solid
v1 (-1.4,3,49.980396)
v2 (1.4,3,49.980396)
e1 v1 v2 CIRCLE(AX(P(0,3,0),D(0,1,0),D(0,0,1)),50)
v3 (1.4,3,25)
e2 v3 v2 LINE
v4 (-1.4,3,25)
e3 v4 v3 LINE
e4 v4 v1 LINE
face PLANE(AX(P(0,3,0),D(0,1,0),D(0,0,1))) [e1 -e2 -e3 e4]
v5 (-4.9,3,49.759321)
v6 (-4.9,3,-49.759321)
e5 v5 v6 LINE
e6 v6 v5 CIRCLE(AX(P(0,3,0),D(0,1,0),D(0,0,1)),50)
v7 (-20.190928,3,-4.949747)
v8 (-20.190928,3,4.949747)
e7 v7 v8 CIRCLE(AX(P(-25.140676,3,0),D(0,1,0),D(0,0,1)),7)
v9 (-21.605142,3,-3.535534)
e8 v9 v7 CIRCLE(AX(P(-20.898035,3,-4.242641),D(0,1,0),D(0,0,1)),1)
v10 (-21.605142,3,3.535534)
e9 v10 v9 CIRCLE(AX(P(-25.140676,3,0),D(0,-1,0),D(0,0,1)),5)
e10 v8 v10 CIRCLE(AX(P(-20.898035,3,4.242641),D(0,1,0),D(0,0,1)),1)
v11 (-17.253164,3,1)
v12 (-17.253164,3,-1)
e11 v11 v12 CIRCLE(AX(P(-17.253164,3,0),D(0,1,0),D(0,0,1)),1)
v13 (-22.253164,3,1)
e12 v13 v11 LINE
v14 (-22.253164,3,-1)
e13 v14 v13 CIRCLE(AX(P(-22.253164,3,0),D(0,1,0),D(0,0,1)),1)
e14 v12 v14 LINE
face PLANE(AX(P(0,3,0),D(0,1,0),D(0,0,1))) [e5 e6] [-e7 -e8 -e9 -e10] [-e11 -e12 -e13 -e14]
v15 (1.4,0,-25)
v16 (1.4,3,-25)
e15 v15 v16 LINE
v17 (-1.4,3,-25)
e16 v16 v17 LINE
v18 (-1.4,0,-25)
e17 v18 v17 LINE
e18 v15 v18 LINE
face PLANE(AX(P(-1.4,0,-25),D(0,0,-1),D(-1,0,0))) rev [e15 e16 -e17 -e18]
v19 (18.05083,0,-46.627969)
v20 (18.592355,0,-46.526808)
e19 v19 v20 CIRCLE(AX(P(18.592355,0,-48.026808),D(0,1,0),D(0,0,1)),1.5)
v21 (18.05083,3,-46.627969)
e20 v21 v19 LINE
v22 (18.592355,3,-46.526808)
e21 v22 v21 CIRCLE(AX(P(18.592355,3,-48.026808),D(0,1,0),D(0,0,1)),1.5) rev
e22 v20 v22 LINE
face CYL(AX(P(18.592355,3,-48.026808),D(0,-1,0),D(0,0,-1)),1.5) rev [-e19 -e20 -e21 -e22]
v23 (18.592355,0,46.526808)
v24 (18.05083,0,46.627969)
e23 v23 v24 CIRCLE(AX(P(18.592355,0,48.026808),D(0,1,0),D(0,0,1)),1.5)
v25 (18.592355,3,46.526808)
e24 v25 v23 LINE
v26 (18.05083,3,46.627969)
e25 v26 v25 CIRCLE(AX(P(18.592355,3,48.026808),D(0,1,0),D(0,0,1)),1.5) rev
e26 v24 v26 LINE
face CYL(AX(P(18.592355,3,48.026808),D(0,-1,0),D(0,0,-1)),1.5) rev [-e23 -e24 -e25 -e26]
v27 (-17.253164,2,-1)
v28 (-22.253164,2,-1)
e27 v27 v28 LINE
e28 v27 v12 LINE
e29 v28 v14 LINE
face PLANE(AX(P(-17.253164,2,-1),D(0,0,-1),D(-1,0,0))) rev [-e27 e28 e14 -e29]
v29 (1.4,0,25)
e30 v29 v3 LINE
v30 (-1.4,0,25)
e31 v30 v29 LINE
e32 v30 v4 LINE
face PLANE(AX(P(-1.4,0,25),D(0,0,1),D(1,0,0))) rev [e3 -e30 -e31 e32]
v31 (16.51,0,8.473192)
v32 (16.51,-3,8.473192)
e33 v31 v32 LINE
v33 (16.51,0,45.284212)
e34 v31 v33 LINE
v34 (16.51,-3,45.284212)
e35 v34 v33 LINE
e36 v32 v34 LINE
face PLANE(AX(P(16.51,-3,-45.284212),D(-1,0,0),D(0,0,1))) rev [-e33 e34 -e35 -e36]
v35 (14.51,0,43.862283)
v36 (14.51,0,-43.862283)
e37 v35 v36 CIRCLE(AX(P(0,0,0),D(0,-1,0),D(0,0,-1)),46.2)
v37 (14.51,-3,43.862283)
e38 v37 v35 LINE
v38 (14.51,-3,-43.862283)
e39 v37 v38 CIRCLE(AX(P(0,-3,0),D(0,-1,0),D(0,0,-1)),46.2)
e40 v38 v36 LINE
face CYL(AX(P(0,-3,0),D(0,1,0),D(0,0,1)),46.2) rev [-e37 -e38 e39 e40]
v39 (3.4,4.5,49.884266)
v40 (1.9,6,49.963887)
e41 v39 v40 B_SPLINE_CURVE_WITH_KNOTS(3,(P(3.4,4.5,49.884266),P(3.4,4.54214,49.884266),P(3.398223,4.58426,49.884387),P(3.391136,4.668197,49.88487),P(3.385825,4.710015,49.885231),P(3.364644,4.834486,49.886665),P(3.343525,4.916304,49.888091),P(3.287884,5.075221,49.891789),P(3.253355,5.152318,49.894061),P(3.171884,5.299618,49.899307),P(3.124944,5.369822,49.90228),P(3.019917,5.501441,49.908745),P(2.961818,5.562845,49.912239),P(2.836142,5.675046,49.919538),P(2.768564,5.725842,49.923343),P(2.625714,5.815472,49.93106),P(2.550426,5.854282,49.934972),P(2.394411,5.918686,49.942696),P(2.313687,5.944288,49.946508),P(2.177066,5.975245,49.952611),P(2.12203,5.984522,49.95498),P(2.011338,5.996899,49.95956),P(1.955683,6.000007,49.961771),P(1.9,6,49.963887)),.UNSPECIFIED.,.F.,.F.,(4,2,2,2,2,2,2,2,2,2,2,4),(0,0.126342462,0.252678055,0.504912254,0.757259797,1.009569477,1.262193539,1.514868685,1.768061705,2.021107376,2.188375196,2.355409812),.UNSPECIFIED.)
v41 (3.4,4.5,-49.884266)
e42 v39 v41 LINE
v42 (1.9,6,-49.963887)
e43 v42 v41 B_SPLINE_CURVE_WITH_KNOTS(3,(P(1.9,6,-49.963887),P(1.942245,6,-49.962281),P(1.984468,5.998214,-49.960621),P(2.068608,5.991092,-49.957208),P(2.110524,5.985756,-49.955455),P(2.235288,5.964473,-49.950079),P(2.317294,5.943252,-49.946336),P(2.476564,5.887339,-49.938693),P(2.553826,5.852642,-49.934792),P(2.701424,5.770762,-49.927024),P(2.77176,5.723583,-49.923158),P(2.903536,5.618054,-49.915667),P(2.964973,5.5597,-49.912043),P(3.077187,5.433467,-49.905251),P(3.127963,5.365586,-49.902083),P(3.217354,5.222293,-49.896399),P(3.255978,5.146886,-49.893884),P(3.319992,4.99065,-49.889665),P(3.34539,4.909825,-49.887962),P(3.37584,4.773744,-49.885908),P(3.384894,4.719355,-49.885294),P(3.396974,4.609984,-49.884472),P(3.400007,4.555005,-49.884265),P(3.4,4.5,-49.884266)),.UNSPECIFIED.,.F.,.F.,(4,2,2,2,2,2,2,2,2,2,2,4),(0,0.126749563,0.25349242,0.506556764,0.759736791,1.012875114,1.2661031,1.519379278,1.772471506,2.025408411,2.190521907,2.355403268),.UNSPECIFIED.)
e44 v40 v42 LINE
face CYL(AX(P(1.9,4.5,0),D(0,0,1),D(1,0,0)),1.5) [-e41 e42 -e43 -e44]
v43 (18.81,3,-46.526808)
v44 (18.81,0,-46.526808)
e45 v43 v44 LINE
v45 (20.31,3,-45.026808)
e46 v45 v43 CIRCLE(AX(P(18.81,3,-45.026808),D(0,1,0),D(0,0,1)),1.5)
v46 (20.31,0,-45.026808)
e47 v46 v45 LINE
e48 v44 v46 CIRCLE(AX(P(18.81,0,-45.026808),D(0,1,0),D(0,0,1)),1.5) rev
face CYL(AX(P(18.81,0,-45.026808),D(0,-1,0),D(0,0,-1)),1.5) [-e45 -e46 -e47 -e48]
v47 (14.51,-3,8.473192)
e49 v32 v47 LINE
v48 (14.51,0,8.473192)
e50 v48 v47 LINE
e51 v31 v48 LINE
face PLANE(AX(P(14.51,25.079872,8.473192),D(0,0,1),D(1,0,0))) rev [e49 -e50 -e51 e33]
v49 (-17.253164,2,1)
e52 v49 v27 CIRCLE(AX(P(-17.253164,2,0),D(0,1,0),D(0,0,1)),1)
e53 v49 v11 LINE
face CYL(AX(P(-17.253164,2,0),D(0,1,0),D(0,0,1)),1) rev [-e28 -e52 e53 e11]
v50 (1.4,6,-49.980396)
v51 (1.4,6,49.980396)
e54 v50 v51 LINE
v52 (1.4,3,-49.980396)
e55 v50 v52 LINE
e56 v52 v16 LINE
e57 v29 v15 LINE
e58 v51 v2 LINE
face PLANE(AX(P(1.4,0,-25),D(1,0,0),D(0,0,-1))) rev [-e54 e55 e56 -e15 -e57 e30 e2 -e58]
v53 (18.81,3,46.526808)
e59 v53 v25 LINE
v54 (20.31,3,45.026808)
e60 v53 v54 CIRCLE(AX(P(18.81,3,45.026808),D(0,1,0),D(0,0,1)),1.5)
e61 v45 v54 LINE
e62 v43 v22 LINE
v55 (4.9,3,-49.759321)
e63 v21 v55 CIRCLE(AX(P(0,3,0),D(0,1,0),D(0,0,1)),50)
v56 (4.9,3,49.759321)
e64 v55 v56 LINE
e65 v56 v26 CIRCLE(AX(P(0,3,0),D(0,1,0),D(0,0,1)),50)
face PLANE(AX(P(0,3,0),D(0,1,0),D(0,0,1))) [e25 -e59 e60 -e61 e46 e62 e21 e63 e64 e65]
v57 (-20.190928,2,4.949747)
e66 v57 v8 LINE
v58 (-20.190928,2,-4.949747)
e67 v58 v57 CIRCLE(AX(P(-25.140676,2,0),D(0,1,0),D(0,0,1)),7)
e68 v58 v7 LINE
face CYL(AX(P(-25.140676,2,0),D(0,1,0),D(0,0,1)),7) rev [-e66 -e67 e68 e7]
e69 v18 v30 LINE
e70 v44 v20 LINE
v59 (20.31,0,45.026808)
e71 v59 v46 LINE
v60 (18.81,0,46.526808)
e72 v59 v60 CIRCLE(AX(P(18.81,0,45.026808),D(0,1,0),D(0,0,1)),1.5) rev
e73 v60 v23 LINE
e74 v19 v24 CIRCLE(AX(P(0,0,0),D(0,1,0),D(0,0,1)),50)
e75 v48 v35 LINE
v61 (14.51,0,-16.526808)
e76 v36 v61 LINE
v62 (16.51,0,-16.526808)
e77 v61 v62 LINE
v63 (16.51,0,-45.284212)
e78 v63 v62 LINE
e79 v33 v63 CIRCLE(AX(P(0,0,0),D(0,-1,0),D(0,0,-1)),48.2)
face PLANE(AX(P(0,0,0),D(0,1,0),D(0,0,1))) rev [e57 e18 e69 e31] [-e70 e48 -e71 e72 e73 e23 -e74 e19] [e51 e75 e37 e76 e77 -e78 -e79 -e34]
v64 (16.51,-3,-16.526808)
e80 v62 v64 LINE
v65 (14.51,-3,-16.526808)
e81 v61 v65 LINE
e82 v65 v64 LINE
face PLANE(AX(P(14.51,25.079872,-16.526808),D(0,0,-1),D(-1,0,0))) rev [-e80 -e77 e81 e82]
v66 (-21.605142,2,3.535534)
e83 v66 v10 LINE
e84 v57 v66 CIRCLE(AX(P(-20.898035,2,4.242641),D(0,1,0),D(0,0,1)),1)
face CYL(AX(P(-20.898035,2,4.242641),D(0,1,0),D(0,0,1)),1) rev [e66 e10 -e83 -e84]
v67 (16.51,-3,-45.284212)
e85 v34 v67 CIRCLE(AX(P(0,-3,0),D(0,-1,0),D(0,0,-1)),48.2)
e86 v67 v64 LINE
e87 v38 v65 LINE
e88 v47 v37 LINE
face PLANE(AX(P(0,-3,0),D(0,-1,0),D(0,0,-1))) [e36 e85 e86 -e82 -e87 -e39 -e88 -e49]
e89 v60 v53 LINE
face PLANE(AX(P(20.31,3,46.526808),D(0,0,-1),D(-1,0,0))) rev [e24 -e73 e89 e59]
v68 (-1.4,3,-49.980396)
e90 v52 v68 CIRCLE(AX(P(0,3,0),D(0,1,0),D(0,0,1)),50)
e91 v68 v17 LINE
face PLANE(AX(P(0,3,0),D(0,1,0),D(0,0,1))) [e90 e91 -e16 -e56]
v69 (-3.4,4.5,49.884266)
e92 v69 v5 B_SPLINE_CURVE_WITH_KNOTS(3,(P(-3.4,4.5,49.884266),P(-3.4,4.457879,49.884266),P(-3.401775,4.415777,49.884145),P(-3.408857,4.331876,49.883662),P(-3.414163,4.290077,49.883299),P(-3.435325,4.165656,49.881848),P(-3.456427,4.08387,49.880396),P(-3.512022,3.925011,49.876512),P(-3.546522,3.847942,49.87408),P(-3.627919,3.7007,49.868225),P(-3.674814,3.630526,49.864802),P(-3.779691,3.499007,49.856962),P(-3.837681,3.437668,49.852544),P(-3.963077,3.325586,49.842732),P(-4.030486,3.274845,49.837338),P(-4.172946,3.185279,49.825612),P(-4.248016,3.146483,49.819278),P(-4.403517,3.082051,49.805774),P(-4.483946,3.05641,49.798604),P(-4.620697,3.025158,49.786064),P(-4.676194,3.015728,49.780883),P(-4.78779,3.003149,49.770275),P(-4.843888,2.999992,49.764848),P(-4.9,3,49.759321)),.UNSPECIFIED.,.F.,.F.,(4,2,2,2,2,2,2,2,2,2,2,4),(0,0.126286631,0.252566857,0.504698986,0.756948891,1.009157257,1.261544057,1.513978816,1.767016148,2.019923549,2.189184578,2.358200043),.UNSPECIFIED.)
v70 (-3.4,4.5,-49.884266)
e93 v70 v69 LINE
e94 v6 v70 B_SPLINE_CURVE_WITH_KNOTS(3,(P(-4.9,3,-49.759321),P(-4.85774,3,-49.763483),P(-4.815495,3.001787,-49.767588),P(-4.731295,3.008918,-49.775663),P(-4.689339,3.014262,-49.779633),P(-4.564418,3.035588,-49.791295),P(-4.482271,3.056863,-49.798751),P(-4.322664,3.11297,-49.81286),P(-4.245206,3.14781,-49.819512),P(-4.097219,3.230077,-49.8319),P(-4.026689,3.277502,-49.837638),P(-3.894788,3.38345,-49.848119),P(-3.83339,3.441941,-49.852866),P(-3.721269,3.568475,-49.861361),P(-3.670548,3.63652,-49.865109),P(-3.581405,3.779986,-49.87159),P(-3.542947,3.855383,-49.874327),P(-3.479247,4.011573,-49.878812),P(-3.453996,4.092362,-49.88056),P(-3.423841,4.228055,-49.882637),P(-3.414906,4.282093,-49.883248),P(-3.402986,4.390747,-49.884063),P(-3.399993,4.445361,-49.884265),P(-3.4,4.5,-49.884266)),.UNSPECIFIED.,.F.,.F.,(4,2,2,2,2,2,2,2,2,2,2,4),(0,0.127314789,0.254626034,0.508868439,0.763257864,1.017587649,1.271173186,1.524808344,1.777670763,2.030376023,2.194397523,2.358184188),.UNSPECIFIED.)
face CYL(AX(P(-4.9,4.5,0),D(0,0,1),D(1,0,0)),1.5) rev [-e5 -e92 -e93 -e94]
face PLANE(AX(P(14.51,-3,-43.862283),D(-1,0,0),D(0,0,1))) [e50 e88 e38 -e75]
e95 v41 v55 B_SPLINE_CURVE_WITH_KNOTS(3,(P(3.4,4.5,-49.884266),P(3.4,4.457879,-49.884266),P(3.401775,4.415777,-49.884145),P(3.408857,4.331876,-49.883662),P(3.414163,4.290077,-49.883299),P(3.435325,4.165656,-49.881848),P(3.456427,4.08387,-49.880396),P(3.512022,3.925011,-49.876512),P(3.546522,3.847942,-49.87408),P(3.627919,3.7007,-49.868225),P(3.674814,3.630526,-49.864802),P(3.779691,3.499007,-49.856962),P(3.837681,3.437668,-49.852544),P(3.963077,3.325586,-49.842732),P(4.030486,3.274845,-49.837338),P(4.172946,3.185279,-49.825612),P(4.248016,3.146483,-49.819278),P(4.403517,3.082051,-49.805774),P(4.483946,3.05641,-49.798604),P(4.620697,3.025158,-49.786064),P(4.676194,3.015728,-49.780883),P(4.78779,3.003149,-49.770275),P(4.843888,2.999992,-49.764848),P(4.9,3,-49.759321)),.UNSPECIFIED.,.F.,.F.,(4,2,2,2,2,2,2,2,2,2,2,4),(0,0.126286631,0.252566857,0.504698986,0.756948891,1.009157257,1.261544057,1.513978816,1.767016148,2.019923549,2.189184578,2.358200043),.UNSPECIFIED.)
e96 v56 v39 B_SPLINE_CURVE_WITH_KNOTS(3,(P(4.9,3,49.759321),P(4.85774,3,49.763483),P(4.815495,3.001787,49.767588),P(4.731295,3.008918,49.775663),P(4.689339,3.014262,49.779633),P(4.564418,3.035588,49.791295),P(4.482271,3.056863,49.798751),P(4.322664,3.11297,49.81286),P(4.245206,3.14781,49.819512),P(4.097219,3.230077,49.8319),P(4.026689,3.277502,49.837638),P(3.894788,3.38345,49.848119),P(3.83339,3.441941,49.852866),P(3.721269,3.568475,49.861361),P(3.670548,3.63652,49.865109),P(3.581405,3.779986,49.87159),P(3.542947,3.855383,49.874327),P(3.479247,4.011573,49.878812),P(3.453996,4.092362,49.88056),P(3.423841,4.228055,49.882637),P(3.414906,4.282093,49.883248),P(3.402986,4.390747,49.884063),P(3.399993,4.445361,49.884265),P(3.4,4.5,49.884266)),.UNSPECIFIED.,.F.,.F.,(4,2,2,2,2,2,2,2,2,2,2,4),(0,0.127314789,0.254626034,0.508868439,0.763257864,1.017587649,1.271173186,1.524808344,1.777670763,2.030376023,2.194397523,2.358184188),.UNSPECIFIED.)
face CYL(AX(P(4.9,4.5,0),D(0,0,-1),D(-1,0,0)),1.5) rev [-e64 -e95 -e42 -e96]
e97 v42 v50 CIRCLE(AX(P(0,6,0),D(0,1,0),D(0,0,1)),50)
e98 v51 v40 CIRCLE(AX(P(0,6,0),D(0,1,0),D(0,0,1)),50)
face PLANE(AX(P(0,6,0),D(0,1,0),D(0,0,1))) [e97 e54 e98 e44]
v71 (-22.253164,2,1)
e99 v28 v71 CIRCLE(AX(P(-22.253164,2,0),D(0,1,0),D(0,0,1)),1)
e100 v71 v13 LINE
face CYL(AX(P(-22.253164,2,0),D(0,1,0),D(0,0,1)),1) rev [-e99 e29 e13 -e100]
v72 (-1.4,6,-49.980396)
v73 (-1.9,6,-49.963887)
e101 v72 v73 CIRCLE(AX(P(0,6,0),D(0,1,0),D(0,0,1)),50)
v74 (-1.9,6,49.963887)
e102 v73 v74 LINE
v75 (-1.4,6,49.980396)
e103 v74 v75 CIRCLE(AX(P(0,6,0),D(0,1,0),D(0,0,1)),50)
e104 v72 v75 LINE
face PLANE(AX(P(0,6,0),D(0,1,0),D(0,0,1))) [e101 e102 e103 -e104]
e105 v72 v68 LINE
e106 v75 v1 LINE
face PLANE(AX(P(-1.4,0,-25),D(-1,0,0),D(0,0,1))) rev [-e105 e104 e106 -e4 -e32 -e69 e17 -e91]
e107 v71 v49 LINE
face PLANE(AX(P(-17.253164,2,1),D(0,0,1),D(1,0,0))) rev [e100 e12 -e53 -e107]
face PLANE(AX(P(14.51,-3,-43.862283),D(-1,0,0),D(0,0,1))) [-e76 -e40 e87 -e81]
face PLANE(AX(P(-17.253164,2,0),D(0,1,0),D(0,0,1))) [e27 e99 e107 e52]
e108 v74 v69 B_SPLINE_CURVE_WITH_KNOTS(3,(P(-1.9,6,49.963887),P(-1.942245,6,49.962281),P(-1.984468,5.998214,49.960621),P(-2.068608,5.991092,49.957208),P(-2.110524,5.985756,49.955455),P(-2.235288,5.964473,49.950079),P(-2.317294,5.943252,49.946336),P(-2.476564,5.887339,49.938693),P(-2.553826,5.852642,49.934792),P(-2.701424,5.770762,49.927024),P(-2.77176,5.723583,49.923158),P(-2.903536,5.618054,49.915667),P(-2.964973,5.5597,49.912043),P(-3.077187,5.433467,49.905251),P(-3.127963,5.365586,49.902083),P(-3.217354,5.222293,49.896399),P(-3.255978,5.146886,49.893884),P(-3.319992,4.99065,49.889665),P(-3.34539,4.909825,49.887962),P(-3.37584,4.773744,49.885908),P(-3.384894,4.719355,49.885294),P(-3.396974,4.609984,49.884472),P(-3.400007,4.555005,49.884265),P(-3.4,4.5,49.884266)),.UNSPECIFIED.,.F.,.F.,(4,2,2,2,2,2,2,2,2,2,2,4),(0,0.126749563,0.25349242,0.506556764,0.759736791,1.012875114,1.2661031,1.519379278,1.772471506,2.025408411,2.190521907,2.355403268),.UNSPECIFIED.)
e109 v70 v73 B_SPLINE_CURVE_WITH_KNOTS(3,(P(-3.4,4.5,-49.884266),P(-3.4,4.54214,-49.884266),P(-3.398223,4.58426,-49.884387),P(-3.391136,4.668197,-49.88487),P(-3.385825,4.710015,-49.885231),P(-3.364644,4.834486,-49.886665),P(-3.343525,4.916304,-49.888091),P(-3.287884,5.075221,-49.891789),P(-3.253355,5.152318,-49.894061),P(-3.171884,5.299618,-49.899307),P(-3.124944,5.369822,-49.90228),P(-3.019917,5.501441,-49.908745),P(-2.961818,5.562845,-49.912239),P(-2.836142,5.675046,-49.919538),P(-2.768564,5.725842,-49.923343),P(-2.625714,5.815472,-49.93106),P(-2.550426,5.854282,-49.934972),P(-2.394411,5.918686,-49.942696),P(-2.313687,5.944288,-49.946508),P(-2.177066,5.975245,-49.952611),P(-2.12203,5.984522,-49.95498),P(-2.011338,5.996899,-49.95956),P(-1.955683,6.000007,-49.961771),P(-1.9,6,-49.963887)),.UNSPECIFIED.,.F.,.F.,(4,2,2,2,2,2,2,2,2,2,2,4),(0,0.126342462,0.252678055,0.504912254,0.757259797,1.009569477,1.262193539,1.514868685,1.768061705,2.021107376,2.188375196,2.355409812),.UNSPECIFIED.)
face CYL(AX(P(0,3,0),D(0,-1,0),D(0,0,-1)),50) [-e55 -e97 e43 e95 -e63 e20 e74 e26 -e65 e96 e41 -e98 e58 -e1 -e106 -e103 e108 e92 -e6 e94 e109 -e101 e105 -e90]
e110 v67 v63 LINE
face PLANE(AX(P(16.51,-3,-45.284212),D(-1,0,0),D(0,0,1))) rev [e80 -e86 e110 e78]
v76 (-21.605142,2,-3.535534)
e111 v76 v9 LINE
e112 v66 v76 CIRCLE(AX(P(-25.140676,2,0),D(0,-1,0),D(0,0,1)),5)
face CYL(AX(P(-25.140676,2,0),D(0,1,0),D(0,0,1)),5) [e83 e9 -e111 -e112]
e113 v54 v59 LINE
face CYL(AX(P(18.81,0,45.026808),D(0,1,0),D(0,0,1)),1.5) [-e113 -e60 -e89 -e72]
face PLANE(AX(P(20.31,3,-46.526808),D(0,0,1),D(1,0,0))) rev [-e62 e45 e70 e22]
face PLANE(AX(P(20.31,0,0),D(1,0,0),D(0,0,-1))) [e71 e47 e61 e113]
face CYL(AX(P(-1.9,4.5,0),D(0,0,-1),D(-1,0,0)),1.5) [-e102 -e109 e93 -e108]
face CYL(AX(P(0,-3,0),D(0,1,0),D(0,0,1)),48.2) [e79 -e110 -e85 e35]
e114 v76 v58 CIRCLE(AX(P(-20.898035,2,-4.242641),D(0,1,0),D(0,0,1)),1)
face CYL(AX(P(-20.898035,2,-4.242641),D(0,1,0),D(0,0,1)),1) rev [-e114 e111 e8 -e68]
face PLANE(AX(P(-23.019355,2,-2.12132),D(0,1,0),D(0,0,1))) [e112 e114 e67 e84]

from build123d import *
from build123d.topology import SkipClean

# Parameters (mm, degrees)
BOSS_EXTRUDE1_DEPTH     = 3
CUT_EXTRUDE1_DEPTH      = 71.774289117
CUT_EXTRUDE1_DEPTH_BACK = 71.774289117
SKETCH2_W               = 2.8
SKETCH2_H               = 50
BOSS_EXTRUDE2_DEPTH     = 3
SKETCH4_W               = 2
SKETCH4_H               = 25
CUT_EXTRUDE2_DEPTH      = 3
BOSS_EXTRUDE3_DEPTH     = 3
SKETCH7_W               = 93.053616802
SKETCH7_H               = 3
BOSS_EXTRUDE4_DEPTH     = 2
CUT_EXTRUDE3_DEPTH      = 1
FILLET1_R               = 1.5


with BuildPart() as part:
    # Sketch1 → Boss-Extrude1 (new body)
    with BuildSketch(Plane(origin=(0, 0, 0), x_dir=(1, 0, 0), z_dir=(0, 1, 0))):
        with BuildLine():
            Line((18.31, 46.526808401), (18.31, -46.526808401))
            ThreePointArc((18.31, -46.526808401), (-50, 0), (18.31, 46.526808401))
        make_face()
    extrude(amount=BOSS_EXTRUDE1_DEPTH)

    # Sketch2 → Cut-Extrude1 (cut, two sides: drawn at the far end of the back side and taken through both)
    with BuildSketch(Plane(origin=(0, 3, 0), x_dir=(1, 0, 0), z_dir=(0, 1, 0)).offset(-CUT_EXTRUDE1_DEPTH_BACK)):
        Rectangle(SKETCH2_W, SKETCH2_H)
    extrude(amount=CUT_EXTRUDE1_DEPTH + CUT_EXTRUDE1_DEPTH_BACK, mode=Mode.SUBTRACT)

    # Sketch3 → Boss-Extrude2 (add)
    with BuildSketch(Plane.XZ):
        with BuildLine():
            Line((16.51, -45.284212481), (16.51, 45.284212481))
            ThreePointArc((16.51, 45.284212481), (-48.2, 0), (16.51, -45.284212481))
        make_face()
        with BuildLine():
            Line((14.51, -43.862283342), (14.51, 43.862283342))
            ThreePointArc((14.51, 43.862283342), (-46.2, 0), (14.51, -43.862283342))
        make_face(mode=Mode.SUBTRACT)
    extrude(amount=BOSS_EXTRUDE2_DEPTH)

    # Sketch4 → Cut-Extrude2 (cut)
    with BuildSketch(Plane.XZ.offset(3)):
        with Locations((15.51, -4.026808401)):
            Rectangle(SKETCH4_W, SKETCH4_H)
    extrude(amount=-CUT_EXTRUDE2_DEPTH, mode=Mode.SUBTRACT)

    # Sketch6 → Boss-Extrude3 (add)
    with SkipClean():  # the faces are left unmerged after this step: merging them gives an invalid solid
        with BuildSketch(Plane(origin=(0, 3, 0), x_dir=(1, 0, 0), z_dir=(0, 1, 0))):
            with BuildLine():
                Line((-1.4, 25), (-1.4, 49.980396157))
                ThreePointArc((-1.4, 49.980396157), (-2.400481254, 49.942343655), (-3.4, 49.884266057))
                Line((-3.4, 49.884266057), (-3.4, -49.884266057))
                ThreePointArc((-3.4, -49.884266057), (-2.400481254, -49.942343655), (-1.4, -49.980396157))
                Line((-1.4, -49.980396157), (-1.4, -25))
                Line((-1.4, -25), (-1.4, 25))
            make_face()
            with BuildLine():
                ThreePointArc((3.4, 49.884266057), (2.400481254, 49.942343655), (1.4, 49.980396157))
                Line((1.4, 49.980396157), (1.4, 25))
                Line((1.4, 25), (1.4, -25))
                Line((1.4, -25), (1.4, -49.980396157))
                ThreePointArc((1.4, -49.980396157), (2.400481254, -49.942343655), (3.4, -49.884266057))
                Line((3.4, -49.884266057), (3.4, 49.884266057))
            make_face()
        extrude(amount=BOSS_EXTRUDE3_DEPTH)

    # Sketch7 → Boss-Extrude4 (add)
    with SkipClean():  # the faces are left unmerged after this step: merging them gives an invalid solid
        with BuildSketch(Plane(origin=(18.31, 0, 0), x_dir=(0, 0, -1), z_dir=(1, 0, 0))):
            with Locations((0, 1.5)):
                Rectangle(SKETCH7_W, SKETCH7_H)
        extrude(amount=BOSS_EXTRUDE4_DEPTH)

    # Sketch8 → Cut-Extrude3 (cut)
    with SkipClean():  # the faces are left unmerged after this step: merging them gives an invalid solid
        with BuildSketch(Plane(origin=(0, 3, 0), x_dir=(1, 0, 0), z_dir=(0, 1, 0))):
            with BuildLine():
                Line((-17.253164172, 1), (-22.253164172, 1))
                ThreePointArc((-22.253164172, 1), (-23.253164172, 0), (-22.253164172, -1))
                Line((-22.253164172, -1), (-17.253164172, -1))
                ThreePointArc((-17.253164172, -1), (-16.253164172, 0), (-17.253164172, 1))
            make_face()
            with BuildLine():
                ThreePointArc((-20.190928157, 4.949747468), (-32.140675626, 0), (-20.190928157, -4.949747468))
                ThreePointArc((-20.190928157, -4.949747468), (-20.190928157, -3.535533906), (-21.60514172, -3.535533906))
                ThreePointArc((-21.60514172, -3.535533906), (-30.140675626, 0), (-21.60514172, 3.535533906))
                ThreePointArc((-21.60514172, 3.535533906), (-20.190928157, 3.535533906), (-20.190928157, 4.949747468))
            make_face()
        extrude(amount=-CUT_EXTRUDE3_DEPTH, mode=Mode.SUBTRACT)

    # Fillet1
    # the kernel refuses this fillet: 1.5 mm, written as the material it adds along each edge
    with BuildSketch(Plane(origin=(18.31, 0, -46.526808401), x_dir=(-0.9315513824511361, 0, -0.3636097108898181), z_dir=(0, 1, 0))) as fillet1_piece_1:
        with BuildLine():
            CenterArc((0.282386116, -1.499994195), FILLET1_R, 90.159404468, 21.162642488)
            Line((-0.26302845, -0.102667121), (0, 0))
            ThreePointArc((0, 0), (0.139106461, -0.000193506), (0.278212923, 0))
        make_face()
    extrude(amount=3)
    with BuildSketch(Plane(origin=(18.31, 0, 46.526808401), x_dir=(-0.9315513824511399, 0, 0.3636097108898083), z_dir=(0, 1, 0))) as fillet1_piece_2:
        with BuildLine():
            CenterArc((0.282386116, 1.499994195), FILLET1_R, 248.677953043, 21.162642488)
            Line((-0.26302845, 0.102667121), (0, 0))
            ThreePointArc((0, 0), (0.139106461, 0.000193506), (0.278212923, 0))
        make_face()
    extrude(amount=3)
    with BuildSketch(Plane(origin=(-3.4, 3, -53.634266057), x_dir=(-1, 0, 0), z_dir=(0, 0, 1))) as fillet1_piece_3_section:
        with BuildLine():
            CenterArc((FILLET1_R, -FILLET1_R), FILLET1_R, 90, 90)
            Line((0, -FILLET1_R), (0, 0))
            Line((0, 0), (FILLET1_R, 0))
        make_face()
    fillet1_piece_3 = extrude(amount=107.268532113, mode=Mode.PRIVATE)
    fillet1_piece_3 = fillet1_piece_3 & Plane(origin=(0, 3.339687762, 0), x_dir=(0.36619999999999997, 0, 0.9305361680235755), z_dir=(0, -1, 0)) * Cylinder(50, 221, mode=Mode.PRIVATE)
    add(fillet1_piece_3)
    with BuildSketch(Plane(origin=(3.4, 3, 53.634266057), x_dir=(1, 0, 0), z_dir=(0, 0, -1))) as fillet1_piece_4_section:
        with BuildLine():
            CenterArc((FILLET1_R, -FILLET1_R), FILLET1_R, 90, 90)
            Line((0, -FILLET1_R), (0, 0))
            Line((0, 0), (FILLET1_R, 0))
        make_face()
    fillet1_piece_4 = extrude(amount=107.268532113, mode=Mode.PRIVATE)
    fillet1_piece_4 = fillet1_piece_4 & Plane(origin=(0, 3.339687762, 0), x_dir=(0.36619999999999997, 0, 0.9305361680235755), z_dir=(0, -1, 0)) * Cylinder(50, 221, mode=Mode.PRIVATE)
    add(fillet1_piece_4)
    # the kernel refuses this fillet: 1.5 mm, written as the material it takes off along each edge
    with BuildSketch(Plane(origin=(-3.4, 6, -53.634266057), x_dir=(0, -1, 0), z_dir=(0, 0, 1)), Plane(origin=(3.4, 6, 53.634266057), x_dir=(0, -1, 0), z_dir=(0, 0, -1))) as fillet1_2_piece_1:
        with BuildLine():
            CenterArc((FILLET1_R, FILLET1_R), FILLET1_R, 180, 90)
            Line((0, FILLET1_R), (0, 0))
            Line((0, 0), (FILLET1_R, 0))
        make_face()
    extrude(amount=107.268532113, mode=Mode.SUBTRACT)
    with BuildSketch(Plane(origin=(20.31, -3.75, 46.526808401), x_dir=(-1, 0, 0), z_dir=(0, 1, 0)), Plane(origin=(20.31, 6.75, -46.526808401), x_dir=(-1, 0, 0), z_dir=(0, -1, 0))) as fillet1_2_piece_2:
        with BuildLine():
            CenterArc((FILLET1_R, -FILLET1_R), FILLET1_R, 90, 90)
            Line((0, -FILLET1_R), (0, 0))
            Line((0, 0), (FILLET1_R, 0))
        make_face()
    extrude(amount=10.5, mode=Mode.SUBTRACT)


solid = part.part
